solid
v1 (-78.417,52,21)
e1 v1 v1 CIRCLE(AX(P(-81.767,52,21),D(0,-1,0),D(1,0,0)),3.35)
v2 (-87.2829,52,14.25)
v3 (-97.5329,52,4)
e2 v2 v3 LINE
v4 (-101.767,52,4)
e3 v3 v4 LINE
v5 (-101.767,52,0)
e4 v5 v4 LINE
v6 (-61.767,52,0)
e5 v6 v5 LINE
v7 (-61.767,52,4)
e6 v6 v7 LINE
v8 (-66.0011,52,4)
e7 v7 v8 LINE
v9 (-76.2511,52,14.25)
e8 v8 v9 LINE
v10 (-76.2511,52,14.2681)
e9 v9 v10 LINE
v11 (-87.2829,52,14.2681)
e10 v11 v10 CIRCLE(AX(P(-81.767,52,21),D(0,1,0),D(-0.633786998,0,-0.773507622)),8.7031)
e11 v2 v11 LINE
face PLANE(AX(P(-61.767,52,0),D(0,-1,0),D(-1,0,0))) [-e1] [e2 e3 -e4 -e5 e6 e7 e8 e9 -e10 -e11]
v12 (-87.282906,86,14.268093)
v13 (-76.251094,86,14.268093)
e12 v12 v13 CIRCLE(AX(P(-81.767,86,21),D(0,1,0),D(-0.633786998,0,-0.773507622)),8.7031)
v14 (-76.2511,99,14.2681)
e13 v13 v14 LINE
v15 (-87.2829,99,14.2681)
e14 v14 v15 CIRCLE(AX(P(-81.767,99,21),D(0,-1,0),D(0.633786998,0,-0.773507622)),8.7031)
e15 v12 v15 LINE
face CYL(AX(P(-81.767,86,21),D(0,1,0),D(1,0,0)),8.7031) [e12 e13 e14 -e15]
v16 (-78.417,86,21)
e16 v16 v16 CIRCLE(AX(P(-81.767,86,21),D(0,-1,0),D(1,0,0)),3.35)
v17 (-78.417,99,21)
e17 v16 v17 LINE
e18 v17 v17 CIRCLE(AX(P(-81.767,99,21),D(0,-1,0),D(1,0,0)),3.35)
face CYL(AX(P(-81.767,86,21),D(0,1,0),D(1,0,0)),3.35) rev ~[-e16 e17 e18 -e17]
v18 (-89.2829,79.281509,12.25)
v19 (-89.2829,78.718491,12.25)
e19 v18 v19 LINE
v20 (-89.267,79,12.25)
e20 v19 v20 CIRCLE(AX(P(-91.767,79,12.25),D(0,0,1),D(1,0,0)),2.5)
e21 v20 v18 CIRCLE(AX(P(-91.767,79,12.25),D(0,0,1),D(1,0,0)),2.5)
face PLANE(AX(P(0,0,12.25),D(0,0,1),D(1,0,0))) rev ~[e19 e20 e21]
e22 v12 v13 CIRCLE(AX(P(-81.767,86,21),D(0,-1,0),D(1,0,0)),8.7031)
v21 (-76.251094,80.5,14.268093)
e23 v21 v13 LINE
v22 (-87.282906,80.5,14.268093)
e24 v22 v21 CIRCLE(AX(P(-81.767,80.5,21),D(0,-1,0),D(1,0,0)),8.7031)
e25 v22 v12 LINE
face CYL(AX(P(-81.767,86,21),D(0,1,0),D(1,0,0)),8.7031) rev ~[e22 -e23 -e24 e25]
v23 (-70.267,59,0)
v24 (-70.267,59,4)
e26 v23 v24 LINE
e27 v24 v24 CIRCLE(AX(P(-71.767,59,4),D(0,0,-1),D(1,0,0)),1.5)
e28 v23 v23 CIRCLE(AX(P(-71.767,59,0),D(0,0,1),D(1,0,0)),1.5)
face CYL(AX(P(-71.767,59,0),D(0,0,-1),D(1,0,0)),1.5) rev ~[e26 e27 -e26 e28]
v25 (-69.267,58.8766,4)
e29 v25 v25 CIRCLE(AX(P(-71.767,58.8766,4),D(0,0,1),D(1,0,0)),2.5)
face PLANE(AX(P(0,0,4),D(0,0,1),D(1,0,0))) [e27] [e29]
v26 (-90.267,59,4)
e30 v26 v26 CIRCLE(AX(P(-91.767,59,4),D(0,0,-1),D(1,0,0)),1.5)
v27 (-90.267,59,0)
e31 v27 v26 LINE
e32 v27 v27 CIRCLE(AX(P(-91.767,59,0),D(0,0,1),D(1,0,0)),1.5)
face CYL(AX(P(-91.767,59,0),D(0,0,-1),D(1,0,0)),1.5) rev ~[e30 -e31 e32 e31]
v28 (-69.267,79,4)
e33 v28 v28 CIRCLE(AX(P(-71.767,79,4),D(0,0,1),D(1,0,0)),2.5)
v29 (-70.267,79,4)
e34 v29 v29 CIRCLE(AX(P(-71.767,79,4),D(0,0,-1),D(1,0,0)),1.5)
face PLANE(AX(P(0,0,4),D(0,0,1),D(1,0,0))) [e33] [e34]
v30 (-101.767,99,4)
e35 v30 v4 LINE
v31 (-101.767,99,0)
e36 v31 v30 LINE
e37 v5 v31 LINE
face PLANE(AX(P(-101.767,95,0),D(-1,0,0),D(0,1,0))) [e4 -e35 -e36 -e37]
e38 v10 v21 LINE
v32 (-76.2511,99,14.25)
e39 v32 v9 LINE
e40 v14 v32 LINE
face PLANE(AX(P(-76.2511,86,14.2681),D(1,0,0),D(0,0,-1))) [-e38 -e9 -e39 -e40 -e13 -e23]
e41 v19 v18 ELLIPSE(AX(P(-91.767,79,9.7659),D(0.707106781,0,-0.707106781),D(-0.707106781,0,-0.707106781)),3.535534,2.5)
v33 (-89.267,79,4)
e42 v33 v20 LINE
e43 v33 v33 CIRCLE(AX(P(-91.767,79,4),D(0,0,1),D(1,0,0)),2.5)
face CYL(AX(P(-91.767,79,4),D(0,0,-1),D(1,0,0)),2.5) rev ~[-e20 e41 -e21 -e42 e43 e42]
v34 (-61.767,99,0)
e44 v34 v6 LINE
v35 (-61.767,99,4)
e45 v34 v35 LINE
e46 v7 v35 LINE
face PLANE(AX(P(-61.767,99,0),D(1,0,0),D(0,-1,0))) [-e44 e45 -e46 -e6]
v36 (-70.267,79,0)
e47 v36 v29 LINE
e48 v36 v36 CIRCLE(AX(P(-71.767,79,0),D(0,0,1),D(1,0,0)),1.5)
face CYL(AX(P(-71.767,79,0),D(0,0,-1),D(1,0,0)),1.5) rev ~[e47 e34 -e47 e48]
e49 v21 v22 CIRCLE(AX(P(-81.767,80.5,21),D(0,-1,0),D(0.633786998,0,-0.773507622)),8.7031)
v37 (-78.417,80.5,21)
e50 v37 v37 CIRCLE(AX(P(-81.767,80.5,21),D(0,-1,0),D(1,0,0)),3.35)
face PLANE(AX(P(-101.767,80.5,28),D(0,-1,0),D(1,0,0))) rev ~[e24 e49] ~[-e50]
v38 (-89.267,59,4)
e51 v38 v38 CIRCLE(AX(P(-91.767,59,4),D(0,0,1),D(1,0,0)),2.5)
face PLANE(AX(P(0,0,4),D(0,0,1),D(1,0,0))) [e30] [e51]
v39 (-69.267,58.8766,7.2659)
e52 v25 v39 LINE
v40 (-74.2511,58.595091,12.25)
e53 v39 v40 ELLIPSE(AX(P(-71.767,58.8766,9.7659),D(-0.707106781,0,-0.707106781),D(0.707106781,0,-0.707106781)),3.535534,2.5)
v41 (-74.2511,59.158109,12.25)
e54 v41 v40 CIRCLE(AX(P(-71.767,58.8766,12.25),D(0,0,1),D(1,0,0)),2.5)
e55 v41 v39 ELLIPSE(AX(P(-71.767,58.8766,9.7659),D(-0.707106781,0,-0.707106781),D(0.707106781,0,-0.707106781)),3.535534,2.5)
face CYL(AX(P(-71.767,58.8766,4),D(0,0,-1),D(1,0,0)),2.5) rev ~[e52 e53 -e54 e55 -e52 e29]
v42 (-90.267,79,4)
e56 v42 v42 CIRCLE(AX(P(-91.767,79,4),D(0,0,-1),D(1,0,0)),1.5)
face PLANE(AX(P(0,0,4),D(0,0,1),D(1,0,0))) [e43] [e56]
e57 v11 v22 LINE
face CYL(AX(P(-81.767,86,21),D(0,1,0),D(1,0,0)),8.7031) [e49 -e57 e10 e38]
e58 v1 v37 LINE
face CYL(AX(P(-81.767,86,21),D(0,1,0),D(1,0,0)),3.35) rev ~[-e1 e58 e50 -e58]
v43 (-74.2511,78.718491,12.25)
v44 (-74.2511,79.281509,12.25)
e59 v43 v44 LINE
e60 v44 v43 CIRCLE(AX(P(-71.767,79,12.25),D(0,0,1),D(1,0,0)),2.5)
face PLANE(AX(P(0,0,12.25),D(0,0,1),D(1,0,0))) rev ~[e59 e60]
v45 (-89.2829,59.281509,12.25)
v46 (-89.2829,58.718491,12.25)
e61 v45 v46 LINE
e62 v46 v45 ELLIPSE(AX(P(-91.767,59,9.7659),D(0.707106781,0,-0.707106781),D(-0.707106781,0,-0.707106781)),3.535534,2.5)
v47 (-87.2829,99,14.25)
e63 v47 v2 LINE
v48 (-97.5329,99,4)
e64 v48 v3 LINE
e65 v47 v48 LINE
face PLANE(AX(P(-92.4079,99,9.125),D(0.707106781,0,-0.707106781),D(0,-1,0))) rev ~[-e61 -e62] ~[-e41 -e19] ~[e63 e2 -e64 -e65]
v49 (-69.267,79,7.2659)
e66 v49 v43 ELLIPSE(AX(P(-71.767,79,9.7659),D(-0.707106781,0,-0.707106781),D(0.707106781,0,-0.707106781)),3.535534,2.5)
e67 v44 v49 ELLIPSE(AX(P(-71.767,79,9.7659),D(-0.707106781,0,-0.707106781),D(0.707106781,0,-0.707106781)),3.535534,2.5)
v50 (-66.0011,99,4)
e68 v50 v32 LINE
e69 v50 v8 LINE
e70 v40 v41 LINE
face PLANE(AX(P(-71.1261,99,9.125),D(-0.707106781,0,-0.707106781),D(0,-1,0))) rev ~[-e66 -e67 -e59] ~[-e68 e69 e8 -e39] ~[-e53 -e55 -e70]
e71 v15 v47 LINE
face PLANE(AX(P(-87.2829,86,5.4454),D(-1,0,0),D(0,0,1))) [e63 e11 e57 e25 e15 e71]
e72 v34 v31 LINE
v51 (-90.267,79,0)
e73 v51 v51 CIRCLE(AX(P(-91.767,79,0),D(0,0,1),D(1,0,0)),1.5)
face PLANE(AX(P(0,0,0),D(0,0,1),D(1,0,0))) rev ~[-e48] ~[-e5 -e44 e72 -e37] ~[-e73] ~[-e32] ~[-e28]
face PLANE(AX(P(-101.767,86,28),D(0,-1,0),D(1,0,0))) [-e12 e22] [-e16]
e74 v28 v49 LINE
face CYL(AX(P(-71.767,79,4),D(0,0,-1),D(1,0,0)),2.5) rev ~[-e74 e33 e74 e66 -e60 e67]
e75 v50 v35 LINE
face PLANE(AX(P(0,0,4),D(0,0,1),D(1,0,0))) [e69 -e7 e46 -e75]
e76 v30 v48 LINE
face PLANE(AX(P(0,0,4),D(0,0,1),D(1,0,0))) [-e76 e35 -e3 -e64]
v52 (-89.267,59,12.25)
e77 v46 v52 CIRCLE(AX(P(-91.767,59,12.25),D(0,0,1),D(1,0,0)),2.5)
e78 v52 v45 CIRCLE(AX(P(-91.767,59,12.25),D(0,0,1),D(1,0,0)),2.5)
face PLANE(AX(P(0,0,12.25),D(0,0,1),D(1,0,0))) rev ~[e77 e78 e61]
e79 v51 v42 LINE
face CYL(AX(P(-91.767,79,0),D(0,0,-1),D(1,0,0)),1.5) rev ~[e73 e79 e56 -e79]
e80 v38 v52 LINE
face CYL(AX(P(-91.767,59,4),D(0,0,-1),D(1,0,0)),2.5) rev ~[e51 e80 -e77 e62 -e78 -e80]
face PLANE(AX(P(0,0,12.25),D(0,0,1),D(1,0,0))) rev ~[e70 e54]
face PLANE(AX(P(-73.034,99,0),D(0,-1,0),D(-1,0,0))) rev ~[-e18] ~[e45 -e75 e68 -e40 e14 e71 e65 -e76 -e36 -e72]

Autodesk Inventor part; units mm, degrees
ref_plane "YZ Plane" through (0, 0, 0) normal (1, 0, 0) x (0, 1, 0)
ref_plane "XZ Plane" through (0, 0, 0) normal (0, 1, 0) x (-1, 0, 0)
ref_plane "XY Plane" through (0, 0, 0) normal (0, 0, 1) x (1, 0, 0)
sketch "Эскиз1" plane through (0, 0, 0) normal (0, 0, 1) x (1, 0, 0)
  line L0 (-76.034, 99) -> (-125.034, 99) projected
  line L1 (-56.034, 99) -> (-73.034, 99) projected
  circle A0 centre (-71.767, -79) radius 1.5 projected
  circle A1 centre (-91.767, -59) radius 1.5 projected
  circle A2 centre (-91.767, -79) radius 1.5 projected
  circle A3 centre (-71.767, -59) radius 1.5 projected
  circle A4 centre (-71.767, 79) radius 1.5 projected
  circle A5 centre (-71.767, 59) radius 1.5 projected
  circle A6 centre (-91.767, 79) radius 1.5 projected
  circle A7 centre (-91.767, 59) radius 1.5 projected
  circle A8 centre (35, -102) radius 1.5 projected
  circle A9 centre (-35, 102) radius 1.5 projected
  circle A10 centre (-35, -102) radius 1.5 projected
  circle A11 centre (35, 102) radius 1.5 projected
  line L2 (15, -105) -> (55, -105) projected
  line L3 (55, -105) -> (55, -99) projected
  line L4 (55, -99) -> (85, -99) projected
  line L5 (85, -99) -> (85, -105) projected
  line L6 (85, -105) -> (115, -105) projected
  line L7 (115, -105) -> (115, 105) projected
  line L8 (115, 105) -> (85, 105) projected
  line L9 (85, 105) -> (85, 99) projected
  line L10 (85, 99) -> (55, 99) projected
  line L11 (55, 99) -> (55, 105) projected
  line L12 (55, 105) -> (15, 105) projected
  line L13 (15, 105) -> (15, 99) projected
  line L14 (15, 99) -> (-15, 99) projected
  line L15 (-15, 99) -> (-15, 105) projected
  line L16 (-15, 105) -> (-55, 105) projected
  line L17 (-55, 105) -> (-55, 99) projected
  line L18 (-55, 99) -> (-85, 99) projected
  line L19 (-85, 99) -> (-85, 105) projected
  line L20 (-85, 105) -> (-115, 105) projected
  line L21 (-115, 105) -> (-115, 65) projected
  line L22 (-115, 65) -> (-109, 65) projected
  line L23 (-109, 65) -> (-109, 35) projected
  line L24 (-109, 35) -> (-115, 35) projected
  line L25 (-115, 35) -> (-115, -35) projected
  line L26 (-115, -35) -> (-109, -35) projected
  line L27 (-109, -35) -> (-109, -65) projected
  line L28 (-109, -65) -> (-115, -65) projected
  line L29 (-115, -65) -> (-115, -105) projected
  line L30 (-115, -105) -> (-85, -105) projected
  line L31 (-85, -105) -> (-85, -99) projected
  line L32 (-85, -99) -> (-55, -99) projected
  line L33 (-55, -99) -> (-55, -105) projected
  line L34 (-55, -105) -> (-15, -105) projected
  line L35 (-15, -105) -> (-15, -99) projected
  line L36 (-15, -99) -> (15, -99) projected
  line L37 (15, -99) -> (15, -105) projected
  line L38 (-61.767, 52) -> (-101.767, 52)
  line L39 (-101.767, 52) -> (-101.767, 99)
  line L40 (-101.767, 99) -> (-61.767, 99)
  line L41 (-61.767, 99) -> (-61.767, 52)
  line L42 (-101.767, 99) -> (-61.767, 99)
  line L43 (-61.767, 99) -> (-61.767, 95)
  line L44 (-61.767, 95) -> (-101.767, 95)
  line L45 (-101.767, 95) -> (-101.767, 99)
  line L46 (-61.767, 90) -> (-101.767, 90)
  line L47 (-101.767, 90) -> (-101.767, 86)
  line L48 (-101.767, 86) -> (-61.767, 86)
  line L49 (-61.767, 86) -> (-61.767, 90)
  point P0 (0, 0)
  dimension "d0" = 10
  dimension "d1" = 10
  dimension "d2" = 7
  dimension "d3" = 4
  dimension "d4" = 5
  dimension "d5" = 4
extrude "Выдавливание1" add sketch "Эскиз1" along normal blind 4 contours L18 L1 L41 L44 L39 L0 | L44 L41 L46 L39 | L46 L41 L48 L39 | L48 L41 L38 L39 | A4 | A5 | A6 | A7
ref_plane "РабПлоскость1" through (-101.767, 86, 28) normal (0, -1, 0) x (1, 0, 0)
sketch "Эскиз2" plane through (-101.767, 86, 28) normal (0, -1, 0) x (1, 0, 0)
  circle A0 centre (20, -7) radius 3.35
  line L0 (0, -28) -> (40, -28) projected
  line L1 (0, -20) -> (0, 0) projected
  line L2 (14.4841, -22.5546) -> (14.4841, -13.7319)
  circle A1 centre (20, -7) radius 8.7031
  line L3 (25.5159, -13.7319) -> (25.5159, -22.5546)
  line L4 (14.4841, -22.5546) -> (14.4841, -24)
  line L5 (25.5159, -22.5546) -> (25.5159, -24)
  line L6 (25.5159, -24) -> (14.4841, -24)
  line L7 (0, -24) -> (40, -24) projected
  point P0 (101.767, -28)
  dimension "d17" = 6.7
  dimension "d18" = 21
  dimension "d19" = 20
extrude "Выдавливание3" add sketch "Эскиз2" along normal blind 34 and the other way blind 13
sketch "Эскиз3" plane through (-101.767, 86, 28) normal (0, -1, 0) x (1, 0, 0)
  circle A0 centre (20, -7) radius 3.35 projected
  circle A1 centre (20, -7) radius 8.7031
  point P0 (101.767, -28)
  point P1 (14.4841, -13.7319)
extrude "Выдавливание4" cut sketch "Эскиз3" along normal blind 5.5
chamfer "Фаска3" distance 10.25 angle 45 1 edges at (-76.251, 75.5, 4)
chamfer "Фаска4" distance 10.25 angle 45 1 edges at (-87.2829, 75.5, 4)
extrude "Выдавливание5" cut sketch "Эскиз1" along normal blind 17.75 contours A4 | A5 | A6 | A7
sketch "Эскиз4" plane through (0, 0, 4) normal (0, 0, 1) x (1, 0, 0)
  circle A0 centre (-71.767, 79) radius 1.5 projected
  circle A1 centre (-71.767, 79) radius 2.5
  circle A2 centre (-71.767, 58.8766) radius 2.5
  circle A3 centre (-91.767, 59) radius 1.5 projected
  circle A4 centre (-91.767, 59) radius 2.5
  circle A5 centre (-91.767, 79) radius 1.5 projected
  circle A6 centre (-91.767, 79) radius 2.5
  point P0 (0, 0)
  dimension "d34" = 5
  dimension "d35" = 5
  dimension "d36" = 5
  dimension "d37" = 5
extrude "Выдавливание6" cut sketch "Эскиз4" along normal blind 8.25 contours A0 | A1 | A2 | A3 | A4 | A5 | A6
properties part number "крепеж валика"
